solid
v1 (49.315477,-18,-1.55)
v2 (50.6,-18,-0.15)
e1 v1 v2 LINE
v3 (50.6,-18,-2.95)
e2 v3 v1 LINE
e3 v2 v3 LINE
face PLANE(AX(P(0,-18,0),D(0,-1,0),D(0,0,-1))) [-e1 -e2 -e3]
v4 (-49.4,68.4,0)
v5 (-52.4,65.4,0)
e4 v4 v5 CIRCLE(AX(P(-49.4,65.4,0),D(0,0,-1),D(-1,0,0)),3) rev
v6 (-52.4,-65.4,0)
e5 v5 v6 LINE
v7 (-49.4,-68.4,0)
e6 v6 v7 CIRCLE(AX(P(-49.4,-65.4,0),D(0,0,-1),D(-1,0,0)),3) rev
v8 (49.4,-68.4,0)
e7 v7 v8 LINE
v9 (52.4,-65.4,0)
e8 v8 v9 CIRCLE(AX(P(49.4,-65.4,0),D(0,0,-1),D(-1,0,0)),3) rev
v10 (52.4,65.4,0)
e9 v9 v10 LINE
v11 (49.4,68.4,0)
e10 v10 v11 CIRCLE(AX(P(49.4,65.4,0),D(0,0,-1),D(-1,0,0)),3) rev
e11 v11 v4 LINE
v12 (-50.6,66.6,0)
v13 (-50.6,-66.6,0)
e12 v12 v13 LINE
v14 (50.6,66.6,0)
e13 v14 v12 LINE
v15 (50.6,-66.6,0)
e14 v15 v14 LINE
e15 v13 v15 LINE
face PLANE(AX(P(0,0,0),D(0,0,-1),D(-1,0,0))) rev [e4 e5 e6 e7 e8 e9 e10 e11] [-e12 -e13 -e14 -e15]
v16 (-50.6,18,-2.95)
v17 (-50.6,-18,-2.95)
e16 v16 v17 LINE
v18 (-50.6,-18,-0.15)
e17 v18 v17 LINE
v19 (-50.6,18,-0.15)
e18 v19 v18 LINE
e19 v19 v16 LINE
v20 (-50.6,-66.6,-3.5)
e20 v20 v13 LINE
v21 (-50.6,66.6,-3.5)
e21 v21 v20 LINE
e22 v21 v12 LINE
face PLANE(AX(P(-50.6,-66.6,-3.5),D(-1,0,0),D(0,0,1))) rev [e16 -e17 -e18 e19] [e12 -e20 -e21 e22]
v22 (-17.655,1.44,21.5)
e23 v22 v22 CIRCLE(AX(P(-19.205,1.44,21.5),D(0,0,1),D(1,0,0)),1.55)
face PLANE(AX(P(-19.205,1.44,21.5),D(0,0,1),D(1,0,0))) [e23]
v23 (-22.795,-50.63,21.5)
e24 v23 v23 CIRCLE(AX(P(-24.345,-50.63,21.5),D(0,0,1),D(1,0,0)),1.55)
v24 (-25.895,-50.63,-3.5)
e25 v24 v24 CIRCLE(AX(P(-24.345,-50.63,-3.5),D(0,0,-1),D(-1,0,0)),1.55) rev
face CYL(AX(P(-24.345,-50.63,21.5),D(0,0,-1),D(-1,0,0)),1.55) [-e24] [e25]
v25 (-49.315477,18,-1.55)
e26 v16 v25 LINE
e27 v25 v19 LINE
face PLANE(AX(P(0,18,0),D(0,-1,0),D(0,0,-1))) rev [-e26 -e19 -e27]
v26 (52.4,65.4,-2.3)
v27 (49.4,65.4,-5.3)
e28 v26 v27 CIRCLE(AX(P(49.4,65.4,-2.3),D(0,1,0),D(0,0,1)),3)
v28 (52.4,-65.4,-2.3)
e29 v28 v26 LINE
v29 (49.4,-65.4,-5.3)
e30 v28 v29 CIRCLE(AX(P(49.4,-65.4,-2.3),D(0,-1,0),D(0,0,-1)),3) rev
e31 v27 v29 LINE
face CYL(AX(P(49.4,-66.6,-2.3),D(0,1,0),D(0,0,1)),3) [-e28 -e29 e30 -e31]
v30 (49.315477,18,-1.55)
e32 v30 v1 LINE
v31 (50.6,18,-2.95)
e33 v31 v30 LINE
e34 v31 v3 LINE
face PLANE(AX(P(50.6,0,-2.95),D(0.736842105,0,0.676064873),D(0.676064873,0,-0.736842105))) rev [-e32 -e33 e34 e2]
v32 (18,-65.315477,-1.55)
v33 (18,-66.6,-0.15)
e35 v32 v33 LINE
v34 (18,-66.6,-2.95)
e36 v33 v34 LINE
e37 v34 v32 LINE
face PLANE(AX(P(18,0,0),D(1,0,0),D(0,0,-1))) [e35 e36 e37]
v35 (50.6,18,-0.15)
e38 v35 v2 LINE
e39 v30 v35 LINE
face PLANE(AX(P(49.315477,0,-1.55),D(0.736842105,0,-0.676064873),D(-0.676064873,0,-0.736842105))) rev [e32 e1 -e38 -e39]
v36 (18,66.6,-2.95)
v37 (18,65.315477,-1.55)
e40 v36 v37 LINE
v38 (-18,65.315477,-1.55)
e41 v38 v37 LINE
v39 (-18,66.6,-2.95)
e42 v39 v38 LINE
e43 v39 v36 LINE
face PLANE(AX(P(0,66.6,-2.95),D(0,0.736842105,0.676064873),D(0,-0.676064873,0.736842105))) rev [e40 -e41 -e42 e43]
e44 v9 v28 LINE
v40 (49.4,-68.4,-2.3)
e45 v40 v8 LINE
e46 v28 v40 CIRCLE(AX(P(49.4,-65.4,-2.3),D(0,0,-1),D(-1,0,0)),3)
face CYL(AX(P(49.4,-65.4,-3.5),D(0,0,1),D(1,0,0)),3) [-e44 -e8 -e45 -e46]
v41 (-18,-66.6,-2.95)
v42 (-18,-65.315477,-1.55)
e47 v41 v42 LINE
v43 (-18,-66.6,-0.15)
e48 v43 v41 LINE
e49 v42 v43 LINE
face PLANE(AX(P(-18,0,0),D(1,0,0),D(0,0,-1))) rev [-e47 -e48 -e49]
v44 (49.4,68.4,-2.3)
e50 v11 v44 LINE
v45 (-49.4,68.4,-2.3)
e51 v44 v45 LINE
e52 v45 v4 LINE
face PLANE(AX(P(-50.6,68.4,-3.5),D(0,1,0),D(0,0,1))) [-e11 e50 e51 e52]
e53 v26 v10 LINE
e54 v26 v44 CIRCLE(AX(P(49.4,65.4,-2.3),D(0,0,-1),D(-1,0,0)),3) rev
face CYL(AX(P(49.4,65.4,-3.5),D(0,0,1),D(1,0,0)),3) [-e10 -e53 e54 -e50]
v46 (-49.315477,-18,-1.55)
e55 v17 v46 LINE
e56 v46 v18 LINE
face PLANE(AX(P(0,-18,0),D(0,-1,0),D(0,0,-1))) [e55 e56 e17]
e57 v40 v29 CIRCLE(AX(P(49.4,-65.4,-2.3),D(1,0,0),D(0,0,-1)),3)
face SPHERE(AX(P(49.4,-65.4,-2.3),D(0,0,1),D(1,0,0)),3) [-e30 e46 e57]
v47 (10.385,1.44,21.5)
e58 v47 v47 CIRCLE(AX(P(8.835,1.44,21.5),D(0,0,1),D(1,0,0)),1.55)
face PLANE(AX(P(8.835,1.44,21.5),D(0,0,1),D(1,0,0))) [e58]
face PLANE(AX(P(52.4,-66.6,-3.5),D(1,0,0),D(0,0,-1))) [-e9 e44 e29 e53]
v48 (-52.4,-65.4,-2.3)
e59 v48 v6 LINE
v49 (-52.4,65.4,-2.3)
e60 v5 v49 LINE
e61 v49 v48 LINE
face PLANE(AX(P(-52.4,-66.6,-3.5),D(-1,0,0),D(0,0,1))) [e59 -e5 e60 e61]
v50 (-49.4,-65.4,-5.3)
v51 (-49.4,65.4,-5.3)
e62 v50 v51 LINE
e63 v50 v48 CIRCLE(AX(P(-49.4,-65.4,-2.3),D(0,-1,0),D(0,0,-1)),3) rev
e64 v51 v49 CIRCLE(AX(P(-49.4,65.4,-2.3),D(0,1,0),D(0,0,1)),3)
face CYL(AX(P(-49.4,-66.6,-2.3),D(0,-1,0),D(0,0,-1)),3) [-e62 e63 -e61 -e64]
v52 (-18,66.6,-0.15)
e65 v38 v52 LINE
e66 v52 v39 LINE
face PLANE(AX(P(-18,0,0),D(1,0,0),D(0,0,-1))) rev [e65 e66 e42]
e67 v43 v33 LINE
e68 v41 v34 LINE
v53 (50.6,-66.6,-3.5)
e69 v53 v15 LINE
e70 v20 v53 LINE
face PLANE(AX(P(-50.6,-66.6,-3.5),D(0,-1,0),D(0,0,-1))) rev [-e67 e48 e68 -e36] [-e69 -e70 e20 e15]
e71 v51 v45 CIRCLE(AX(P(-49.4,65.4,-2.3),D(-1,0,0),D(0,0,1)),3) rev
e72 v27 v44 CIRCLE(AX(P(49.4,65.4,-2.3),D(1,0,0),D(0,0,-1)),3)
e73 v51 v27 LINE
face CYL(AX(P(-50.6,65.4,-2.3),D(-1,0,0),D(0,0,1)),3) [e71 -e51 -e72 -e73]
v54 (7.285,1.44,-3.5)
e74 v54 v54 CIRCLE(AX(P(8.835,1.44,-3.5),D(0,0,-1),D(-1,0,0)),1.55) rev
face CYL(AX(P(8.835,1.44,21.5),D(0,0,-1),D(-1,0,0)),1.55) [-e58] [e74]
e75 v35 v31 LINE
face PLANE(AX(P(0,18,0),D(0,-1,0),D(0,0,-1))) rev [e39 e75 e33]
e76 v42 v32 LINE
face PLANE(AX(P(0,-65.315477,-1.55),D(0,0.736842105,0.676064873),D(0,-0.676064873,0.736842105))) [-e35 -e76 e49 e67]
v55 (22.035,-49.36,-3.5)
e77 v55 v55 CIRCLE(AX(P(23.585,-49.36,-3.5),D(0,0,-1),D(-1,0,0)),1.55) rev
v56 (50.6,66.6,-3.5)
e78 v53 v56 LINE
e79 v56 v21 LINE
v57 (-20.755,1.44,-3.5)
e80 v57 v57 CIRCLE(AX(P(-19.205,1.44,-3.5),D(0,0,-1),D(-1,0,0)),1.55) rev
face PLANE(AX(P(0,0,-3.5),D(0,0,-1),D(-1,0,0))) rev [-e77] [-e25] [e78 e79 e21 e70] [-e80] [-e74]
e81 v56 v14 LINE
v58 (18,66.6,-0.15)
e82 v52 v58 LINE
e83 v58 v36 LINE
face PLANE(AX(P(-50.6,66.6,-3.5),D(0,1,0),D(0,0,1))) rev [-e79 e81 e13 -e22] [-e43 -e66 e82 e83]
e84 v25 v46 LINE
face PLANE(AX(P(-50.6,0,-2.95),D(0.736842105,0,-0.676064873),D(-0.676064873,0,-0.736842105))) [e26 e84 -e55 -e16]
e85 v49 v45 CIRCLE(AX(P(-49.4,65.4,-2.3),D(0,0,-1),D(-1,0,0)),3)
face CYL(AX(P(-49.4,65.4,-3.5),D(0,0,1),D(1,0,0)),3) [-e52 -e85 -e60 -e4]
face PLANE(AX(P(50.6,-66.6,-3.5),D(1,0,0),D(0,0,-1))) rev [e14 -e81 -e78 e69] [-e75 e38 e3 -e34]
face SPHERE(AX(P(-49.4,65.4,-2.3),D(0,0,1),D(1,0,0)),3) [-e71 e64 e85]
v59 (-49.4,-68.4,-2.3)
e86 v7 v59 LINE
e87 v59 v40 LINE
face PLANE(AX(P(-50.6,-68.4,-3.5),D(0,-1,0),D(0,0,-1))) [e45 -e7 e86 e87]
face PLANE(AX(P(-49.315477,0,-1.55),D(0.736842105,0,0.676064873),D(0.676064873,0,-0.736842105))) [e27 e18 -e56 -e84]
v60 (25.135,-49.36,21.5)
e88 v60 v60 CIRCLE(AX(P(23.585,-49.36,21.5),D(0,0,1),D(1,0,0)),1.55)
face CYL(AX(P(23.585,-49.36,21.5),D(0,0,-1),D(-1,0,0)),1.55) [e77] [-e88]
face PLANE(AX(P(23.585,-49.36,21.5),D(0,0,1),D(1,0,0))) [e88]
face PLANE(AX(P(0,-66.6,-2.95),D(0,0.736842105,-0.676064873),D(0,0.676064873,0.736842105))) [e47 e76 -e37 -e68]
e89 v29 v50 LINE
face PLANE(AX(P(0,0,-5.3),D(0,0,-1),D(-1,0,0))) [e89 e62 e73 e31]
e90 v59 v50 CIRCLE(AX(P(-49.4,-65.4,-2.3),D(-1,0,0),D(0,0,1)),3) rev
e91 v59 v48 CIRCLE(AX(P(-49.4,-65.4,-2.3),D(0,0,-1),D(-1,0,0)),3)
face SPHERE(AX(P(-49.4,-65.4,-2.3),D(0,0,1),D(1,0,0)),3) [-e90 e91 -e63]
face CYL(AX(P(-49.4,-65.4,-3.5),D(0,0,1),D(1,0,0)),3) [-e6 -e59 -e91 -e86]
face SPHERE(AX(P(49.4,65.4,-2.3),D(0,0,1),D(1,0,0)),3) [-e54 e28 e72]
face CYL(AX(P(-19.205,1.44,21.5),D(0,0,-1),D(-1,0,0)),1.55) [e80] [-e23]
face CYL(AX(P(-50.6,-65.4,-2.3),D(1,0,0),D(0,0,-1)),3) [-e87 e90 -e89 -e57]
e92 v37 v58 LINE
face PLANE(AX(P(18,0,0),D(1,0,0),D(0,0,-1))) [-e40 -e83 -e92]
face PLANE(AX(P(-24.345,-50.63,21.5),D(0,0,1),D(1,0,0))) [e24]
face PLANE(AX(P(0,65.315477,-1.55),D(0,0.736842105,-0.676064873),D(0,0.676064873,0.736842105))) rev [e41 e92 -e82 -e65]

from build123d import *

# Parameters (mm, degrees)
ESQUISSE1_W        = 101.2
ESQUISSE1_H        = 133.2
BOSS_EXTRU_1_DEPTH = 3.5
COQUE1_T           = 1.8
CONG_4_R           = 3
BOSS_EXTRU_2_DEPTH = 18
BOSS_EXTRU_3_DEPTH = 18
ESQUISSE5_R        = 1.55
BOSS_EXTRU_4_DEPTH = 25


with BuildPart() as part:
    # Esquisse1 → Boss.-Extru.1 (new body)
    with BuildSketch(Plane.XY):
        Rectangle(ESQUISSE1_W, ESQUISSE1_H)
    extrude(amount=-BOSS_EXTRU_1_DEPTH)

    # Coque1
    coque1_openings = [part.faces().sort_by_distance(p)[0] for p in [
        (0, 0, 0),
    ]]
    offset(amount=COQUE1_T, openings=coque1_openings, kind=Kind.INTERSECTION)

    # Congé4
    # the kernel refuses this fillet: 3 mm, written as the material it takes off along each edge
    with BuildSketch(Plane(origin=(-49.4, -65.4, -2.3), x_dir=(0, 0, -1), z_dir=(-1, 0, 0))) as cong_4_piece_1_section:
        Polygon((0, 0), (CONG_4_R, 0), (CONG_4_R, CONG_4_R), (0, CONG_4_R), align=None)
    cong_4_piece_1 = extrude(amount=CONG_4_R, mode=Mode.PRIVATE)
    cong_4_piece_1 = cong_4_piece_1 - Plane(origin=(-49.4, -65.4, -2.3), x_dir=(0, 0.7071067811865475, 0.7071067811865475), z_dir=(-1, 0, 0)) * Sphere(CONG_4_R, mode=Mode.PRIVATE)
    add(cong_4_piece_1, mode=Mode.SUBTRACT)
    with BuildSketch(Plane(origin=(-49.4, 65.4, -2.3), x_dir=(-1, 0, 0), z_dir=(0, 1, 0))) as cong_4_piece_2_section:
        Polygon((0, 0), (CONG_4_R, 0), (CONG_4_R, -CONG_4_R), (0, -CONG_4_R), align=None)
    cong_4_piece_2 = extrude(amount=CONG_4_R, mode=Mode.PRIVATE)
    cong_4_piece_2 = cong_4_piece_2 - Plane(origin=(-49.4, 65.4, -2.3), x_dir=(0.7071067811865475, 0, 0.7071067811865475), z_dir=(0, 1, 0)) * Sphere(CONG_4_R, mode=Mode.PRIVATE)
    add(cong_4_piece_2, mode=Mode.SUBTRACT)
    with BuildSketch(Plane(origin=(49.4, -65.4, -2.3), x_dir=(0, -1, 0), z_dir=(0, 0, -1))) as cong_4_piece_3_section:
        Polygon((0, 0), (CONG_4_R, 0), (CONG_4_R, -CONG_4_R), (0, -CONG_4_R), align=None)
    cong_4_piece_3 = extrude(amount=CONG_4_R, mode=Mode.PRIVATE)
    cong_4_piece_3 = cong_4_piece_3 - Plane(origin=(49.4, -65.4, -2.3), x_dir=(-0.7071067811865475, 0.7071067811865475, 0), z_dir=(0, 0, -1)) * Sphere(CONG_4_R, mode=Mode.PRIVATE)
    add(cong_4_piece_3, mode=Mode.SUBTRACT)
    with BuildSketch(Plane(origin=(49.4, 65.4, -2.3), x_dir=(0, 0, -1), z_dir=(0, 1, 0))) as cong_4_piece_4_section:
        Polygon((0, 0), (CONG_4_R, 0), (CONG_4_R, -CONG_4_R), (0, -CONG_4_R), align=None)
    cong_4_piece_4 = extrude(amount=CONG_4_R, mode=Mode.PRIVATE)
    cong_4_piece_4 = cong_4_piece_4 - Plane(origin=(49.4, 65.4, -2.3), x_dir=(-0.7071067811865475, 0, 0.7071067811865475), z_dir=(0, 1, 0)) * Sphere(CONG_4_R, mode=Mode.PRIVATE)
    add(cong_4_piece_4, mode=Mode.SUBTRACT)
    with BuildSketch(Plane(origin=(-52.4, -65.4, -5.3), x_dir=(0, 0, 1), z_dir=(0, 1, 0)), Plane(origin=(52.4, 65.4, -5.3), x_dir=(0, 0, 1), z_dir=(0, -1, 0))) as cong_4_piece_5:
        with BuildLine():
            CenterArc((CONG_4_R, CONG_4_R), CONG_4_R, 180, 90)
            Line((0, CONG_4_R), (0, 0))
            Line((0, 0), (CONG_4_R, 0))
        make_face()
    extrude(amount=130.8, mode=Mode.SUBTRACT)
    with BuildSketch(Plane(origin=(49.4, -68.4, -5.3), x_dir=(0, 0, 1), z_dir=(-1, 0, 0)), Plane(origin=(-49.4, 68.4, -5.3), x_dir=(0, 0, 1), z_dir=(1, 0, 0))) as cong_4_piece_6:
        with BuildLine():
            CenterArc((CONG_4_R, CONG_4_R), CONG_4_R, 180, 90)
            Line((0, CONG_4_R), (0, 0))
            Line((0, 0), (CONG_4_R, 0))
        make_face()
    extrude(amount=98.8, mode=Mode.SUBTRACT)
    with BuildSketch(Plane(origin=(52.4, -68.4, -2.3), x_dir=(-1, 0, 0), z_dir=(0, 0, 1)), Plane(origin=(-52.4, -68.4, 7.5), x_dir=(1, 0, 0), z_dir=(0, 0, -1)), Plane(origin=(-52.4, 68.4, -2.3), x_dir=(1, 0, 0), z_dir=(0, 0, 1)), Plane(origin=(52.4, 68.4, -2.3), x_dir=(0, -1, 0), z_dir=(0, 0, 1))) as cong_4_piece_7:
        with BuildLine():
            CenterArc((CONG_4_R, -CONG_4_R), CONG_4_R, 90, 90)
            Line((0, -CONG_4_R), (0, 0))
            Line((0, 0), (CONG_4_R, 0))
        make_face()
    extrude(amount=9.8, mode=Mode.SUBTRACT)

    # Esquisse3D1 → Boss.-Extru.2 (add, symmetric)
    with BuildSketch(Plane(origin=(50.6, 0, -0.15), x_dir=(0, 0, -1), z_dir=(0, 1, 0))):
        Polygon((0, 0), (2.8, 0), (1.4, 1.284523258), align=None)
    boss_extru_2 = extrude(amount=BOSS_EXTRU_2_DEPTH, both=True)

    # Symétrie1: Boss.-Extru.2 across plane
    add(boss_extru_2.mirror(Plane(origin=(0, 0, 0), x_dir=(0, 0, 1), z_dir=(1, 0, 0))))

    # Esquisse3D2 → Boss.-Extru.3 (add, symmetric)
    with BuildSketch(Plane(origin=(0, 66.6, -0.15), x_dir=(0, 0, -1), z_dir=(-1, 0, 0))):
        Polygon((0, 0), (2.8, 0), (1.4, 1.284523258), align=None)
    boss_extru_3 = extrude(amount=BOSS_EXTRU_3_DEPTH, both=True)

    # Symétrie2: Boss.-Extru.3 across plane
    add(boss_extru_3.mirror(Plane.ZX))

    # Esquisse5 → Boss.-Extru.4 (add)
    with BuildSketch(Plane.XY.offset(-3.5)):
        with Locations(Location((-24.345, -50.63, 0), (0, 0, 180))):
            Circle(ESQUISSE5_R)
        with Locations(Location((23.585, -49.36, 0), (0, 0, 180))):
            Circle(ESQUISSE5_R)
        with Locations(Location((8.835, 1.44, 0), (0, 0, 180))):
            Circle(ESQUISSE5_R)
        with Locations(Location((-19.205, 1.44, 0), (0, 0, 180))):
            Circle(ESQUISSE5_R)
    extrude(amount=BOSS_EXTRU_4_DEPTH)


solid = part.part
